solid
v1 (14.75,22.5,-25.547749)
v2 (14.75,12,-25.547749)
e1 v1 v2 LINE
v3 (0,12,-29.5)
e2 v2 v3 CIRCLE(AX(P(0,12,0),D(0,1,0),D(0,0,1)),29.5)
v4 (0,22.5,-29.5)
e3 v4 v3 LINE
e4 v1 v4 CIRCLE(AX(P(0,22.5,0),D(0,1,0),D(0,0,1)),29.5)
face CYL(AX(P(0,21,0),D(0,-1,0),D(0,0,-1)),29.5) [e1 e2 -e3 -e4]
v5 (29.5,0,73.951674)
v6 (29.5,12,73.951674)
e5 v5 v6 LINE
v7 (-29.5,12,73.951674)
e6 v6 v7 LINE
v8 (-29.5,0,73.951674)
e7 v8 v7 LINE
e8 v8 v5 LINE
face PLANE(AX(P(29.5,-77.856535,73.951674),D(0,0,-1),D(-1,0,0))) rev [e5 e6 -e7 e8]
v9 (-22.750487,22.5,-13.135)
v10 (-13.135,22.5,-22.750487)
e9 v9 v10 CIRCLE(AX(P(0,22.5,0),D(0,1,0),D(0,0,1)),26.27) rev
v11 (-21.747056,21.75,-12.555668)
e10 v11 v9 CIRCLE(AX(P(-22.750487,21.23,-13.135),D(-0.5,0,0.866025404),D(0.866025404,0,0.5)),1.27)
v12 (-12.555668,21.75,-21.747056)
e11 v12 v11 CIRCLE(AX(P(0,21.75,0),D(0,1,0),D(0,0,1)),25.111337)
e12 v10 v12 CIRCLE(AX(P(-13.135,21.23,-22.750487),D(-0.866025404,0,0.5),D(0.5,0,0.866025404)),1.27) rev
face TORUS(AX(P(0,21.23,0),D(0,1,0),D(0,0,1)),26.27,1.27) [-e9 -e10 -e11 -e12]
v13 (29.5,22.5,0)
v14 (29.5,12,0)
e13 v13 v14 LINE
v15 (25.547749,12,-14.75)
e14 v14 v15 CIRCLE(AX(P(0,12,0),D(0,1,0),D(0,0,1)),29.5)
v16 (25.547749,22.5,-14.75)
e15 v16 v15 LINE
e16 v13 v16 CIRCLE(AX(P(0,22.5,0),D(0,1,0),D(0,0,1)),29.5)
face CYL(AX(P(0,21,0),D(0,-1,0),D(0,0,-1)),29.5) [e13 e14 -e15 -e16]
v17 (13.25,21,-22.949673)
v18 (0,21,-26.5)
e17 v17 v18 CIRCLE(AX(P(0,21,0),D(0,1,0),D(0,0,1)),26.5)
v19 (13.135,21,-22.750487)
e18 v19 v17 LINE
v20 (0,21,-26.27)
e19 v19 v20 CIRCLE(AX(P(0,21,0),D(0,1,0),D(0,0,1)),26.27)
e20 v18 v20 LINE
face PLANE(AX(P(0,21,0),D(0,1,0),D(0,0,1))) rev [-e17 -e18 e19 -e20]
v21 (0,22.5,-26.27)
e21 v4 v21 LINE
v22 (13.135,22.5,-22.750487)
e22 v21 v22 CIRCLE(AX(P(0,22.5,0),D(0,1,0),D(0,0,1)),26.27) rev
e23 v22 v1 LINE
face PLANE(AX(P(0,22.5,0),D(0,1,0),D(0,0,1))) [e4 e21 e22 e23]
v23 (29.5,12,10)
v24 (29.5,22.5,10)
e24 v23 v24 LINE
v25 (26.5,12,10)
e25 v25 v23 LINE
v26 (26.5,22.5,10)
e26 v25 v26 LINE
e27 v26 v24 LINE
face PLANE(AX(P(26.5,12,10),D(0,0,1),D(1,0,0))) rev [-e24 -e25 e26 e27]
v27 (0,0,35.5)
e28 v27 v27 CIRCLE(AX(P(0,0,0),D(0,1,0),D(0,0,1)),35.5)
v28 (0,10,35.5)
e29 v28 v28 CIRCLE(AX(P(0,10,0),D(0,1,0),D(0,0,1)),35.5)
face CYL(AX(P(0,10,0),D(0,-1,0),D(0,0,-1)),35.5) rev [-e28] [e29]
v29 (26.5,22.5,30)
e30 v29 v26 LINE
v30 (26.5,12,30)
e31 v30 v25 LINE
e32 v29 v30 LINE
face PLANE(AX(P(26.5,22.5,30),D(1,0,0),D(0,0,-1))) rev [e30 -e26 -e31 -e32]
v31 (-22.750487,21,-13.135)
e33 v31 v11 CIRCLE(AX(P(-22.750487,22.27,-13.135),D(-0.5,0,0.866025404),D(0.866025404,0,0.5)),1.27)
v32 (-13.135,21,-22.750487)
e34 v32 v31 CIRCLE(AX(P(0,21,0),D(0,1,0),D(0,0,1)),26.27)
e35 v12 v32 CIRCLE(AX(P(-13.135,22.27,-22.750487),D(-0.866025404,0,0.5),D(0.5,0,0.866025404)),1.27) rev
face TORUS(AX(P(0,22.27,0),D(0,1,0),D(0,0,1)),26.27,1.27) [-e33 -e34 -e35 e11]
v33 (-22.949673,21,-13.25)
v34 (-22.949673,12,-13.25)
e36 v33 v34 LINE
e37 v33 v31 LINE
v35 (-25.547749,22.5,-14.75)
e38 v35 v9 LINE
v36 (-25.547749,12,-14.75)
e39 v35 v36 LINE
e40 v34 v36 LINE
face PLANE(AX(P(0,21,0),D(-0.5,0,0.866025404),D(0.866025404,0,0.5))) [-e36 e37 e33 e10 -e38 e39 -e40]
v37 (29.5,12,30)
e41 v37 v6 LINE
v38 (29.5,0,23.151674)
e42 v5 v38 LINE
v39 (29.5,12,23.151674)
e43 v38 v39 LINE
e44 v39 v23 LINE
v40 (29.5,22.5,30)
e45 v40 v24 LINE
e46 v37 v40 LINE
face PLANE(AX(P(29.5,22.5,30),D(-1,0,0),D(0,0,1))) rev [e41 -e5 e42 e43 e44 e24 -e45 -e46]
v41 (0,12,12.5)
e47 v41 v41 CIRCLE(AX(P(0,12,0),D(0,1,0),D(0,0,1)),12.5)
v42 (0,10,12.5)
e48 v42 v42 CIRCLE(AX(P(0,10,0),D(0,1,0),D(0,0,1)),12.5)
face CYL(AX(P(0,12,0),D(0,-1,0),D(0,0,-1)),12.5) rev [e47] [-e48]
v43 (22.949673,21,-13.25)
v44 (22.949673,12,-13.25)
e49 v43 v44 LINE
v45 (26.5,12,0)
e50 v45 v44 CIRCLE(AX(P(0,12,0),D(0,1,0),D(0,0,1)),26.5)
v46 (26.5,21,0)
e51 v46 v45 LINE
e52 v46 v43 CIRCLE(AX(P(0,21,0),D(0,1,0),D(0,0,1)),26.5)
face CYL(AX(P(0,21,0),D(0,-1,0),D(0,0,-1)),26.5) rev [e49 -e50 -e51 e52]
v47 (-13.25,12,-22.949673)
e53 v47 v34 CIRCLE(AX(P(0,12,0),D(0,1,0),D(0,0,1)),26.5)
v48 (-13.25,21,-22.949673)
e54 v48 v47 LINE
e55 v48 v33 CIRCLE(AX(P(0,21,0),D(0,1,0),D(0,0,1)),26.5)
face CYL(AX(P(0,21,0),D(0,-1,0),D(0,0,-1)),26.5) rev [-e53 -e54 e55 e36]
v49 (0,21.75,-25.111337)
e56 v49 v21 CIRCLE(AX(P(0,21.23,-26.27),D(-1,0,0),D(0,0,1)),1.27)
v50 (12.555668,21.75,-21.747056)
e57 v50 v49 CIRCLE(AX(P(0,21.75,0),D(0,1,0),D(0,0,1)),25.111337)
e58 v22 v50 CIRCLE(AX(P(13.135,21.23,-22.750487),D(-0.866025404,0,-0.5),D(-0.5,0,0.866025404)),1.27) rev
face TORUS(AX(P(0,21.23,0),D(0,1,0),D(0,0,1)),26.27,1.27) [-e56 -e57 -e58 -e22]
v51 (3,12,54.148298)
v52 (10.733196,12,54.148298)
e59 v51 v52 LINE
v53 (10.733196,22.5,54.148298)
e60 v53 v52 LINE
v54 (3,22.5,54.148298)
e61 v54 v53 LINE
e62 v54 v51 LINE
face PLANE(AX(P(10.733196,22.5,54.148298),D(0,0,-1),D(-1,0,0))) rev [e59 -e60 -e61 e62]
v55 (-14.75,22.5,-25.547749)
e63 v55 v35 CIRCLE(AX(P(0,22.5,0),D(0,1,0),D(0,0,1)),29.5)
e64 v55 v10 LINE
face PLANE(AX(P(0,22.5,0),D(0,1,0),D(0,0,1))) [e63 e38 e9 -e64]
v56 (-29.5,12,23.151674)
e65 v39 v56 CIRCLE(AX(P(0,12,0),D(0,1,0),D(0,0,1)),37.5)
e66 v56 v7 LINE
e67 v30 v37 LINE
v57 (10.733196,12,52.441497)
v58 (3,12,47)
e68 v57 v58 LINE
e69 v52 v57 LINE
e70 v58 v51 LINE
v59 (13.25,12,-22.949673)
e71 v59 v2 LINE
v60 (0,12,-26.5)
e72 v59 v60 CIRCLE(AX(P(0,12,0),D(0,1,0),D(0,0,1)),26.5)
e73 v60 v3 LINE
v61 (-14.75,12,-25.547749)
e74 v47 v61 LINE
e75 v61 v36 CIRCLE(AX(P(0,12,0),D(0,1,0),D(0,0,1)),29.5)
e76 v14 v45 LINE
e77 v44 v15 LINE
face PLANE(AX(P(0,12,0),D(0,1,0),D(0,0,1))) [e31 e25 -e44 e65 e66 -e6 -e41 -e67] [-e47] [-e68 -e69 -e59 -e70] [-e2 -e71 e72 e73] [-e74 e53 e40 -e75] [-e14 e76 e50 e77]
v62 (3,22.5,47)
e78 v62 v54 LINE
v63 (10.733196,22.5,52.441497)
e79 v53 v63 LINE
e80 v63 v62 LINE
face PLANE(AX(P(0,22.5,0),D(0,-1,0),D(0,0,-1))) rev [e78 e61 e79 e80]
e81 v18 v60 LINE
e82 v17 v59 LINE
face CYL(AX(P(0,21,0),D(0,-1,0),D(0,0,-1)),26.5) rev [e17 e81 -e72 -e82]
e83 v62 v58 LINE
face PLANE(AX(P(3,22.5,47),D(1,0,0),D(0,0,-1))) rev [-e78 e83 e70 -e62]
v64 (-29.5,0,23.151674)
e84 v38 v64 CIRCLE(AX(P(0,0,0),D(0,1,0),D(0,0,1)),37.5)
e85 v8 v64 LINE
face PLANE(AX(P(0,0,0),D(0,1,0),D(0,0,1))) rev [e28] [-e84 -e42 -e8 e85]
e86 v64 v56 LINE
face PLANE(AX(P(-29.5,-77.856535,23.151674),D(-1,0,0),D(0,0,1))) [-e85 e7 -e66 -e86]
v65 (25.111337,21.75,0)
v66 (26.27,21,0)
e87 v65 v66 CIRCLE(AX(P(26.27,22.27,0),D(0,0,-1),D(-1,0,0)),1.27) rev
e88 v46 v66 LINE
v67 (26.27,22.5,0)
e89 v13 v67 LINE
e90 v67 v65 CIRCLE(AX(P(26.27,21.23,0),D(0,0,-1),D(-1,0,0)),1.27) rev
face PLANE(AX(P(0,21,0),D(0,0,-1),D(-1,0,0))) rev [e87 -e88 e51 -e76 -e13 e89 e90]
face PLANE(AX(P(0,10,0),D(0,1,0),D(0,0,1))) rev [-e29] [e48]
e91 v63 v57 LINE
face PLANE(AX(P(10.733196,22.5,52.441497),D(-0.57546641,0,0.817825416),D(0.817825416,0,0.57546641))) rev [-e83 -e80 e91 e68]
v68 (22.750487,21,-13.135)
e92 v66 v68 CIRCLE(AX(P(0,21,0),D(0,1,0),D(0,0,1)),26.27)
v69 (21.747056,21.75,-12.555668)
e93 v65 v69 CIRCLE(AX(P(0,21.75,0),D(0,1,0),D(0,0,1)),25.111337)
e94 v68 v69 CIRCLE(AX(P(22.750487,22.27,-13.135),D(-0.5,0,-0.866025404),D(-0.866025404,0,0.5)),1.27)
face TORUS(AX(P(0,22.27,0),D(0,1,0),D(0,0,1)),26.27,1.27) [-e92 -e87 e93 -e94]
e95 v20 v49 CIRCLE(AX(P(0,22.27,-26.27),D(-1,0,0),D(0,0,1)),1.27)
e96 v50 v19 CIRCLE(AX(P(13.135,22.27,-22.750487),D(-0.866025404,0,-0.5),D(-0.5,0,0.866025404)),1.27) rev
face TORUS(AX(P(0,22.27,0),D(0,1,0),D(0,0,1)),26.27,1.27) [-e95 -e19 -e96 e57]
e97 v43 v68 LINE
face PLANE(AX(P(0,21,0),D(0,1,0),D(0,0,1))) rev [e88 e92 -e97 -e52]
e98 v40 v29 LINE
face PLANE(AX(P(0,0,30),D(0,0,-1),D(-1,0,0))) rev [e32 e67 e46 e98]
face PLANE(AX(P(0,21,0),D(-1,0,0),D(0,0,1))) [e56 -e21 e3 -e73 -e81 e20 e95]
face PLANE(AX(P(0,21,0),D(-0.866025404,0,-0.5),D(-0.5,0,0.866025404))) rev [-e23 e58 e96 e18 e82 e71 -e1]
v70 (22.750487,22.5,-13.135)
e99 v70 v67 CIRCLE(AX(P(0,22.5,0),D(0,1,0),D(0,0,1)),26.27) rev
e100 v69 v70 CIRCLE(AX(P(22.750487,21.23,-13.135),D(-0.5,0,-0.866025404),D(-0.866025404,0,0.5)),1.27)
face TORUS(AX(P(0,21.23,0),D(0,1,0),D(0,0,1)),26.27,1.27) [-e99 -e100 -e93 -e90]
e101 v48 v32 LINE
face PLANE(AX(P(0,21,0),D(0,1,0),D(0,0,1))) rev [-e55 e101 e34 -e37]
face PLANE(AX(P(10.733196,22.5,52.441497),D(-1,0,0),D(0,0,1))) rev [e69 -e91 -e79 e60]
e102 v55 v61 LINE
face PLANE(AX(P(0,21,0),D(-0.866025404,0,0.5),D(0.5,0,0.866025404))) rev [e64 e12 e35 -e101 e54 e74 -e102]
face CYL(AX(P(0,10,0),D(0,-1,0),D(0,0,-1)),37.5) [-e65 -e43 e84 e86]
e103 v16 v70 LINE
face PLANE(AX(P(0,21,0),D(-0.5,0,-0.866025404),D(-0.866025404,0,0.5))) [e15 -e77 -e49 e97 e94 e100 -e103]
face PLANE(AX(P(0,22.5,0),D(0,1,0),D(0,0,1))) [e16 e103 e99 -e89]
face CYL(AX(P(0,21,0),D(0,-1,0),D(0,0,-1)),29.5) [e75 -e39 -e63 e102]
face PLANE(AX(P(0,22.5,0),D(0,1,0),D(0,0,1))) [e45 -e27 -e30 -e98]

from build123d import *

# Parameters (mm, degrees)
SKETCH1_R           = 37.5
SKETCH1_R_2         = 35.5
BOSS_EXTRUDE1_DEPTH = 10
SKETCH2_R           = 37.5
SKETCH2_R_2         = 12.5
BOSS_EXTRUDE2_DEPTH = 2
BOSS_EXTRUDE3_DEPTH = 9
BOSS_EXTRUDE4_DEPTH = 1.5
FILLET1_R           = 1.27
SKETCH6_W           = 3
SKETCH6_H           = 10.5
BOSS_EXTRUDE5_DEPTH = 30
SKETCH7_W           = 3
SKETCH7_H           = 10
CUT_EXTRUDE1_DEPTH  = 10.5
BOSS_EXTRUDE6_DEPTH = 10.5
BOSS_EXTRUDE8_START = -12
BOSS_EXTRUDE8_DEPTH = 12


with BuildPart() as part:
    # Sketch1 → Boss-Extrude1 (new body)
    with BuildSketch(Plane(origin=(0, 0, 0), x_dir=(1, 0, 0), z_dir=(0, 1, 0))):
        with Locations(Location((0, 0, 0), (0, 0, 270))):
            Circle(SKETCH1_R)
        with Locations(Location((0, 0, 0), (0, 0, 270))):
            Circle(SKETCH1_R_2, mode=Mode.SUBTRACT)
    extrude(amount=BOSS_EXTRUDE1_DEPTH)

    # Sketch2 → Boss-Extrude2 (add)
    with BuildSketch(Plane(origin=(0, 10, 0), x_dir=(1, 0, 0), z_dir=(0, 1, 0))):
        with Locations(Location((0, 0, 0), (0, 0, 270))):
            Circle(SKETCH2_R)
        with Locations(Location((0, 0, 0), (0, 0, 270))):
            Circle(SKETCH2_R_2, mode=Mode.SUBTRACT)
    extrude(amount=BOSS_EXTRUDE2_DEPTH)

    # Sketch4 → Boss-Extrude3 (add)
    with BuildSketch(Plane(origin=(0, 12, 0), x_dir=(1, 0, 0), z_dir=(0, 1, 0))):
        with BuildLine():
            Line((13.25, 22.9496732), (14.75, 25.547749412))
            ThreePointArc((14.75, 25.547749412), (7.635161831, 28.494811876), (0, 29.5))
            Line((0, 29.5), (0, 26.5))
            ThreePointArc((0, 26.5), (6.858704695, 25.597034397), (13.25, 22.9496732))
        make_face()
        with BuildLine():
            ThreePointArc((26.5, 0), (25.597034397, 6.858704695), (22.9496732, 13.25))
            Line((22.9496732, 13.25), (25.547749412, 14.75))
            ThreePointArc((25.547749412, 14.75), (28.494811876, 7.635161831), (29.5, 0))
            Line((29.5, 0), (26.5, 0))
        make_face()
        with BuildLine():
            Line((-13.25, 22.9496732), (-14.75, 25.547749412))
            ThreePointArc((-14.75, 25.547749412), (-20.859650045, 20.859650045), (-25.547749412, 14.75))
            Line((-25.547749412, 14.75), (-22.9496732, 13.25))
            ThreePointArc((-22.9496732, 13.25), (-18.738329701, 18.738329701), (-13.25, 22.9496732))
        make_face()
    extrude(amount=BOSS_EXTRUDE3_DEPTH)

    # Sketch5 → Boss-Extrude4 (add)
    with BuildSketch(Plane(origin=(0, 21, 0), x_dir=(1, 0, 0), z_dir=(0, 1, 0))):
        with BuildLine():
            Line((-12.5, 21.650635095), (-14.75, 25.547749412))
            ThreePointArc((-14.75, 25.547749412), (-20.859650045, 20.859650045), (-25.547749412, 14.75))
            Line((-25.547749412, 14.75), (-21.650635095, 12.5))
            ThreePointArc((-21.650635095, 12.5), (-17.67766953, 17.67766953), (-12.5, 21.650635095))
        make_face()
        with BuildLine():
            ThreePointArc((0, 26.5), (6.858704695, 25.597034397), (13.25, 22.9496732))
            Line((13.25, 22.9496732), (14.75, 25.547749412))
            ThreePointArc((14.75, 25.547749412), (7.635161831, 28.494811876), (0, 29.5))
            Line((0, 29.5), (0, 26.5))
        make_face()
        with BuildLine():
            Line((0, 26.5), (0, 25))
            ThreePointArc((0, 25), (6.470476128, 24.148145657), (12.5, 21.650635095))
            Line((12.5, 21.650635095), (13.25, 22.9496732))
            ThreePointArc((13.25, 22.9496732), (6.858704695, 25.597034397), (0, 26.5))
        make_face()
        with BuildLine():
            Line((25, 0), (29.5, 0))
            ThreePointArc((29.5, 0), (28.494811876, 7.635161831), (25.547749412, 14.75))
            Line((25.547749412, 14.75), (21.650635095, 12.5))
            ThreePointArc((21.650635095, 12.5), (24.148145657, 6.470476128), (25, 0))
        make_face()
    extrude(amount=BOSS_EXTRUDE4_DEPTH)

    # Fillet1
    # the kernel refuses this fillet: 1.27 mm, written as the material it takes off along each edge
    with BuildSketch(Plane(origin=(0, 21, 0), x_dir=(0.795717852622937, 0, -0.605667482218702), z_dir=(-0.605667482218702, 0, -0.795717852622937))) as fillet1_piece_1:
        with BuildLine():
            CenterArc((25 + FILLET1_R, -FILLET1_R), FILLET1_R, 90, 90)
            Line((25 + FILLET1_R, 0), (25, 0))
            Line((25, 0), (25, -FILLET1_R))
        make_face()
    revolve(axis=Axis((0, 21, 0), (0, -1, 0)), revolution_arc=44.553777402, mode=Mode.SUBTRACT)
    with BuildSketch(Plane(origin=(0, 22.5, 0), x_dir=(0.795717852622937, 0, -0.605667482218702), z_dir=(-0.605667482218702, 0, -0.795717852622937))) as fillet1_piece_2:
        with BuildLine():
            CenterArc((25 + FILLET1_R, FILLET1_R), FILLET1_R, 180, 90)
            Line((25, FILLET1_R), (25, 0))
            Line((25, 0), (25 + FILLET1_R, 0))
        make_face()
    revolve(axis=Axis((0, 22.5, 0), (0, -1, 0)), revolution_arc=44.553777402, mode=Mode.SUBTRACT)
    with BuildSketch(Plane(origin=(0, 21, 0), x_dir=(-0.12666449953608933, 0, -0.9919456157256162), z_dir=(-0.9919456157256162, 0, 0.12666449953608933))) as fillet1_piece_3:
        with BuildLine():
            CenterArc((25 + FILLET1_R, -FILLET1_R), FILLET1_R, 90, 90)
            Line((25 + FILLET1_R, 0), (25, 0))
            Line((25, 0), (25, -FILLET1_R))
        make_face()
    revolve(axis=Axis((0, 21, 0), (0, -1, 0)), revolution_arc=44.553777402, mode=Mode.SUBTRACT)
    with BuildSketch(Plane(origin=(0, 22.5, 0), x_dir=(-0.12666449953608933, 0, -0.9919456157256162), z_dir=(-0.9919456157256162, 0, 0.12666449953608933))) as fillet1_piece_4:
        with BuildLine():
            CenterArc((25 + FILLET1_R, FILLET1_R), FILLET1_R, 180, 90)
            Line((25, FILLET1_R), (25, 0))
            Line((25, 0), (25 + FILLET1_R, 0))
        make_face()
    revolve(axis=Axis((0, 22.5, 0), (0, -1, 0)), revolution_arc=44.553777402, mode=Mode.SUBTRACT)
    with BuildSketch(Plane(origin=(0, 21, 0), x_dir=(-0.9223823521590265, 0, -0.386278133506909), z_dir=(-0.386278133506909, 0, 0.9223823521590265))) as fillet1_piece_5:
        with BuildLine():
            CenterArc((25 + FILLET1_R, -FILLET1_R), FILLET1_R, 90, 90)
            Line((25 + FILLET1_R, 0), (25, 0))
            Line((25, 0), (25, -FILLET1_R))
        make_face()
    revolve(axis=Axis((0, 21, 0), (0, -1, 0)), revolution_arc=44.553777402, mode=Mode.SUBTRACT)
    with BuildSketch(Plane(origin=(0, 22.5, 0), x_dir=(-0.9223823521590265, 0, -0.386278133506909), z_dir=(-0.386278133506909, 0, 0.9223823521590265))) as fillet1_piece_6:
        with BuildLine():
            CenterArc((25 + FILLET1_R, FILLET1_R), FILLET1_R, 180, 90)
            Line((25, FILLET1_R), (25, 0))
            Line((25, 0), (25 + FILLET1_R, 0))
        make_face()
    revolve(axis=Axis((0, 22.5, 0), (0, -1, 0)), revolution_arc=44.553777402, mode=Mode.SUBTRACT)

    # Sketch6 → Boss-Extrude5 (add)
    with BuildSketch(Plane.XY):
        with Locations((28, 17.25)):
            Rectangle(SKETCH6_W, SKETCH6_H)
    extrude(amount=BOSS_EXTRUDE5_DEPTH)

    # Sketch7 → Cut-Extrude1 (cut)
    with BuildSketch(Plane(origin=(0, 22.5, 0), x_dir=(1, 0, 0), z_dir=(0, 1, 0))):
        with Locations((28, -5)):
            Rectangle(SKETCH7_W, SKETCH7_H)
    extrude(amount=-CUT_EXTRUDE1_DEPTH, mode=Mode.SUBTRACT)



with BuildPart() as body_2:
    # Sketch8 → Boss-Extrude6 (new body)
    with BuildSketch(Plane(origin=(0, 12, 0), x_dir=(1, 0, 0), z_dir=(0, 1, 0))):
        Polygon((10.733196366, -52.441497251), (3, -47), (3, -54.148297887), (10.733196366, -54.148297887), align=None)
    extrude(amount=BOSS_EXTRUDE6_DEPTH)


with BuildPart() as part_1:
    add(part.part)

    add(body_2.part)  # Boss-Extrude8 merges body 2
    # Sketch9 → Boss-Extrude8 (add)
    with BuildSketch(Plane(origin=(0, 12, 0), x_dir=(1, 0, 0), z_dir=(0, 1, 0)).offset(BOSS_EXTRUDE8_START)):
        with BuildLine():
            Line((-26.911893282, -23.151673806), (-29.5, -23.151673806))
            Line((-29.5, -23.151673806), (-29.5, -73.951673806))
            Line((-29.5, -73.951673806), (29.5, -73.951673806))
            Line((29.5, -73.951673806), (29.5, -23.151673806))
            Line((29.5, -23.151673806), (26.911893282, -23.151673806))
            ThreePointArc((26.911893282, -23.151673806), (0, -35.5), (-26.911893282, -23.151673806))
        make_face()
    extrude(amount=BOSS_EXTRUDE8_DEPTH)


solid = part_1.part
